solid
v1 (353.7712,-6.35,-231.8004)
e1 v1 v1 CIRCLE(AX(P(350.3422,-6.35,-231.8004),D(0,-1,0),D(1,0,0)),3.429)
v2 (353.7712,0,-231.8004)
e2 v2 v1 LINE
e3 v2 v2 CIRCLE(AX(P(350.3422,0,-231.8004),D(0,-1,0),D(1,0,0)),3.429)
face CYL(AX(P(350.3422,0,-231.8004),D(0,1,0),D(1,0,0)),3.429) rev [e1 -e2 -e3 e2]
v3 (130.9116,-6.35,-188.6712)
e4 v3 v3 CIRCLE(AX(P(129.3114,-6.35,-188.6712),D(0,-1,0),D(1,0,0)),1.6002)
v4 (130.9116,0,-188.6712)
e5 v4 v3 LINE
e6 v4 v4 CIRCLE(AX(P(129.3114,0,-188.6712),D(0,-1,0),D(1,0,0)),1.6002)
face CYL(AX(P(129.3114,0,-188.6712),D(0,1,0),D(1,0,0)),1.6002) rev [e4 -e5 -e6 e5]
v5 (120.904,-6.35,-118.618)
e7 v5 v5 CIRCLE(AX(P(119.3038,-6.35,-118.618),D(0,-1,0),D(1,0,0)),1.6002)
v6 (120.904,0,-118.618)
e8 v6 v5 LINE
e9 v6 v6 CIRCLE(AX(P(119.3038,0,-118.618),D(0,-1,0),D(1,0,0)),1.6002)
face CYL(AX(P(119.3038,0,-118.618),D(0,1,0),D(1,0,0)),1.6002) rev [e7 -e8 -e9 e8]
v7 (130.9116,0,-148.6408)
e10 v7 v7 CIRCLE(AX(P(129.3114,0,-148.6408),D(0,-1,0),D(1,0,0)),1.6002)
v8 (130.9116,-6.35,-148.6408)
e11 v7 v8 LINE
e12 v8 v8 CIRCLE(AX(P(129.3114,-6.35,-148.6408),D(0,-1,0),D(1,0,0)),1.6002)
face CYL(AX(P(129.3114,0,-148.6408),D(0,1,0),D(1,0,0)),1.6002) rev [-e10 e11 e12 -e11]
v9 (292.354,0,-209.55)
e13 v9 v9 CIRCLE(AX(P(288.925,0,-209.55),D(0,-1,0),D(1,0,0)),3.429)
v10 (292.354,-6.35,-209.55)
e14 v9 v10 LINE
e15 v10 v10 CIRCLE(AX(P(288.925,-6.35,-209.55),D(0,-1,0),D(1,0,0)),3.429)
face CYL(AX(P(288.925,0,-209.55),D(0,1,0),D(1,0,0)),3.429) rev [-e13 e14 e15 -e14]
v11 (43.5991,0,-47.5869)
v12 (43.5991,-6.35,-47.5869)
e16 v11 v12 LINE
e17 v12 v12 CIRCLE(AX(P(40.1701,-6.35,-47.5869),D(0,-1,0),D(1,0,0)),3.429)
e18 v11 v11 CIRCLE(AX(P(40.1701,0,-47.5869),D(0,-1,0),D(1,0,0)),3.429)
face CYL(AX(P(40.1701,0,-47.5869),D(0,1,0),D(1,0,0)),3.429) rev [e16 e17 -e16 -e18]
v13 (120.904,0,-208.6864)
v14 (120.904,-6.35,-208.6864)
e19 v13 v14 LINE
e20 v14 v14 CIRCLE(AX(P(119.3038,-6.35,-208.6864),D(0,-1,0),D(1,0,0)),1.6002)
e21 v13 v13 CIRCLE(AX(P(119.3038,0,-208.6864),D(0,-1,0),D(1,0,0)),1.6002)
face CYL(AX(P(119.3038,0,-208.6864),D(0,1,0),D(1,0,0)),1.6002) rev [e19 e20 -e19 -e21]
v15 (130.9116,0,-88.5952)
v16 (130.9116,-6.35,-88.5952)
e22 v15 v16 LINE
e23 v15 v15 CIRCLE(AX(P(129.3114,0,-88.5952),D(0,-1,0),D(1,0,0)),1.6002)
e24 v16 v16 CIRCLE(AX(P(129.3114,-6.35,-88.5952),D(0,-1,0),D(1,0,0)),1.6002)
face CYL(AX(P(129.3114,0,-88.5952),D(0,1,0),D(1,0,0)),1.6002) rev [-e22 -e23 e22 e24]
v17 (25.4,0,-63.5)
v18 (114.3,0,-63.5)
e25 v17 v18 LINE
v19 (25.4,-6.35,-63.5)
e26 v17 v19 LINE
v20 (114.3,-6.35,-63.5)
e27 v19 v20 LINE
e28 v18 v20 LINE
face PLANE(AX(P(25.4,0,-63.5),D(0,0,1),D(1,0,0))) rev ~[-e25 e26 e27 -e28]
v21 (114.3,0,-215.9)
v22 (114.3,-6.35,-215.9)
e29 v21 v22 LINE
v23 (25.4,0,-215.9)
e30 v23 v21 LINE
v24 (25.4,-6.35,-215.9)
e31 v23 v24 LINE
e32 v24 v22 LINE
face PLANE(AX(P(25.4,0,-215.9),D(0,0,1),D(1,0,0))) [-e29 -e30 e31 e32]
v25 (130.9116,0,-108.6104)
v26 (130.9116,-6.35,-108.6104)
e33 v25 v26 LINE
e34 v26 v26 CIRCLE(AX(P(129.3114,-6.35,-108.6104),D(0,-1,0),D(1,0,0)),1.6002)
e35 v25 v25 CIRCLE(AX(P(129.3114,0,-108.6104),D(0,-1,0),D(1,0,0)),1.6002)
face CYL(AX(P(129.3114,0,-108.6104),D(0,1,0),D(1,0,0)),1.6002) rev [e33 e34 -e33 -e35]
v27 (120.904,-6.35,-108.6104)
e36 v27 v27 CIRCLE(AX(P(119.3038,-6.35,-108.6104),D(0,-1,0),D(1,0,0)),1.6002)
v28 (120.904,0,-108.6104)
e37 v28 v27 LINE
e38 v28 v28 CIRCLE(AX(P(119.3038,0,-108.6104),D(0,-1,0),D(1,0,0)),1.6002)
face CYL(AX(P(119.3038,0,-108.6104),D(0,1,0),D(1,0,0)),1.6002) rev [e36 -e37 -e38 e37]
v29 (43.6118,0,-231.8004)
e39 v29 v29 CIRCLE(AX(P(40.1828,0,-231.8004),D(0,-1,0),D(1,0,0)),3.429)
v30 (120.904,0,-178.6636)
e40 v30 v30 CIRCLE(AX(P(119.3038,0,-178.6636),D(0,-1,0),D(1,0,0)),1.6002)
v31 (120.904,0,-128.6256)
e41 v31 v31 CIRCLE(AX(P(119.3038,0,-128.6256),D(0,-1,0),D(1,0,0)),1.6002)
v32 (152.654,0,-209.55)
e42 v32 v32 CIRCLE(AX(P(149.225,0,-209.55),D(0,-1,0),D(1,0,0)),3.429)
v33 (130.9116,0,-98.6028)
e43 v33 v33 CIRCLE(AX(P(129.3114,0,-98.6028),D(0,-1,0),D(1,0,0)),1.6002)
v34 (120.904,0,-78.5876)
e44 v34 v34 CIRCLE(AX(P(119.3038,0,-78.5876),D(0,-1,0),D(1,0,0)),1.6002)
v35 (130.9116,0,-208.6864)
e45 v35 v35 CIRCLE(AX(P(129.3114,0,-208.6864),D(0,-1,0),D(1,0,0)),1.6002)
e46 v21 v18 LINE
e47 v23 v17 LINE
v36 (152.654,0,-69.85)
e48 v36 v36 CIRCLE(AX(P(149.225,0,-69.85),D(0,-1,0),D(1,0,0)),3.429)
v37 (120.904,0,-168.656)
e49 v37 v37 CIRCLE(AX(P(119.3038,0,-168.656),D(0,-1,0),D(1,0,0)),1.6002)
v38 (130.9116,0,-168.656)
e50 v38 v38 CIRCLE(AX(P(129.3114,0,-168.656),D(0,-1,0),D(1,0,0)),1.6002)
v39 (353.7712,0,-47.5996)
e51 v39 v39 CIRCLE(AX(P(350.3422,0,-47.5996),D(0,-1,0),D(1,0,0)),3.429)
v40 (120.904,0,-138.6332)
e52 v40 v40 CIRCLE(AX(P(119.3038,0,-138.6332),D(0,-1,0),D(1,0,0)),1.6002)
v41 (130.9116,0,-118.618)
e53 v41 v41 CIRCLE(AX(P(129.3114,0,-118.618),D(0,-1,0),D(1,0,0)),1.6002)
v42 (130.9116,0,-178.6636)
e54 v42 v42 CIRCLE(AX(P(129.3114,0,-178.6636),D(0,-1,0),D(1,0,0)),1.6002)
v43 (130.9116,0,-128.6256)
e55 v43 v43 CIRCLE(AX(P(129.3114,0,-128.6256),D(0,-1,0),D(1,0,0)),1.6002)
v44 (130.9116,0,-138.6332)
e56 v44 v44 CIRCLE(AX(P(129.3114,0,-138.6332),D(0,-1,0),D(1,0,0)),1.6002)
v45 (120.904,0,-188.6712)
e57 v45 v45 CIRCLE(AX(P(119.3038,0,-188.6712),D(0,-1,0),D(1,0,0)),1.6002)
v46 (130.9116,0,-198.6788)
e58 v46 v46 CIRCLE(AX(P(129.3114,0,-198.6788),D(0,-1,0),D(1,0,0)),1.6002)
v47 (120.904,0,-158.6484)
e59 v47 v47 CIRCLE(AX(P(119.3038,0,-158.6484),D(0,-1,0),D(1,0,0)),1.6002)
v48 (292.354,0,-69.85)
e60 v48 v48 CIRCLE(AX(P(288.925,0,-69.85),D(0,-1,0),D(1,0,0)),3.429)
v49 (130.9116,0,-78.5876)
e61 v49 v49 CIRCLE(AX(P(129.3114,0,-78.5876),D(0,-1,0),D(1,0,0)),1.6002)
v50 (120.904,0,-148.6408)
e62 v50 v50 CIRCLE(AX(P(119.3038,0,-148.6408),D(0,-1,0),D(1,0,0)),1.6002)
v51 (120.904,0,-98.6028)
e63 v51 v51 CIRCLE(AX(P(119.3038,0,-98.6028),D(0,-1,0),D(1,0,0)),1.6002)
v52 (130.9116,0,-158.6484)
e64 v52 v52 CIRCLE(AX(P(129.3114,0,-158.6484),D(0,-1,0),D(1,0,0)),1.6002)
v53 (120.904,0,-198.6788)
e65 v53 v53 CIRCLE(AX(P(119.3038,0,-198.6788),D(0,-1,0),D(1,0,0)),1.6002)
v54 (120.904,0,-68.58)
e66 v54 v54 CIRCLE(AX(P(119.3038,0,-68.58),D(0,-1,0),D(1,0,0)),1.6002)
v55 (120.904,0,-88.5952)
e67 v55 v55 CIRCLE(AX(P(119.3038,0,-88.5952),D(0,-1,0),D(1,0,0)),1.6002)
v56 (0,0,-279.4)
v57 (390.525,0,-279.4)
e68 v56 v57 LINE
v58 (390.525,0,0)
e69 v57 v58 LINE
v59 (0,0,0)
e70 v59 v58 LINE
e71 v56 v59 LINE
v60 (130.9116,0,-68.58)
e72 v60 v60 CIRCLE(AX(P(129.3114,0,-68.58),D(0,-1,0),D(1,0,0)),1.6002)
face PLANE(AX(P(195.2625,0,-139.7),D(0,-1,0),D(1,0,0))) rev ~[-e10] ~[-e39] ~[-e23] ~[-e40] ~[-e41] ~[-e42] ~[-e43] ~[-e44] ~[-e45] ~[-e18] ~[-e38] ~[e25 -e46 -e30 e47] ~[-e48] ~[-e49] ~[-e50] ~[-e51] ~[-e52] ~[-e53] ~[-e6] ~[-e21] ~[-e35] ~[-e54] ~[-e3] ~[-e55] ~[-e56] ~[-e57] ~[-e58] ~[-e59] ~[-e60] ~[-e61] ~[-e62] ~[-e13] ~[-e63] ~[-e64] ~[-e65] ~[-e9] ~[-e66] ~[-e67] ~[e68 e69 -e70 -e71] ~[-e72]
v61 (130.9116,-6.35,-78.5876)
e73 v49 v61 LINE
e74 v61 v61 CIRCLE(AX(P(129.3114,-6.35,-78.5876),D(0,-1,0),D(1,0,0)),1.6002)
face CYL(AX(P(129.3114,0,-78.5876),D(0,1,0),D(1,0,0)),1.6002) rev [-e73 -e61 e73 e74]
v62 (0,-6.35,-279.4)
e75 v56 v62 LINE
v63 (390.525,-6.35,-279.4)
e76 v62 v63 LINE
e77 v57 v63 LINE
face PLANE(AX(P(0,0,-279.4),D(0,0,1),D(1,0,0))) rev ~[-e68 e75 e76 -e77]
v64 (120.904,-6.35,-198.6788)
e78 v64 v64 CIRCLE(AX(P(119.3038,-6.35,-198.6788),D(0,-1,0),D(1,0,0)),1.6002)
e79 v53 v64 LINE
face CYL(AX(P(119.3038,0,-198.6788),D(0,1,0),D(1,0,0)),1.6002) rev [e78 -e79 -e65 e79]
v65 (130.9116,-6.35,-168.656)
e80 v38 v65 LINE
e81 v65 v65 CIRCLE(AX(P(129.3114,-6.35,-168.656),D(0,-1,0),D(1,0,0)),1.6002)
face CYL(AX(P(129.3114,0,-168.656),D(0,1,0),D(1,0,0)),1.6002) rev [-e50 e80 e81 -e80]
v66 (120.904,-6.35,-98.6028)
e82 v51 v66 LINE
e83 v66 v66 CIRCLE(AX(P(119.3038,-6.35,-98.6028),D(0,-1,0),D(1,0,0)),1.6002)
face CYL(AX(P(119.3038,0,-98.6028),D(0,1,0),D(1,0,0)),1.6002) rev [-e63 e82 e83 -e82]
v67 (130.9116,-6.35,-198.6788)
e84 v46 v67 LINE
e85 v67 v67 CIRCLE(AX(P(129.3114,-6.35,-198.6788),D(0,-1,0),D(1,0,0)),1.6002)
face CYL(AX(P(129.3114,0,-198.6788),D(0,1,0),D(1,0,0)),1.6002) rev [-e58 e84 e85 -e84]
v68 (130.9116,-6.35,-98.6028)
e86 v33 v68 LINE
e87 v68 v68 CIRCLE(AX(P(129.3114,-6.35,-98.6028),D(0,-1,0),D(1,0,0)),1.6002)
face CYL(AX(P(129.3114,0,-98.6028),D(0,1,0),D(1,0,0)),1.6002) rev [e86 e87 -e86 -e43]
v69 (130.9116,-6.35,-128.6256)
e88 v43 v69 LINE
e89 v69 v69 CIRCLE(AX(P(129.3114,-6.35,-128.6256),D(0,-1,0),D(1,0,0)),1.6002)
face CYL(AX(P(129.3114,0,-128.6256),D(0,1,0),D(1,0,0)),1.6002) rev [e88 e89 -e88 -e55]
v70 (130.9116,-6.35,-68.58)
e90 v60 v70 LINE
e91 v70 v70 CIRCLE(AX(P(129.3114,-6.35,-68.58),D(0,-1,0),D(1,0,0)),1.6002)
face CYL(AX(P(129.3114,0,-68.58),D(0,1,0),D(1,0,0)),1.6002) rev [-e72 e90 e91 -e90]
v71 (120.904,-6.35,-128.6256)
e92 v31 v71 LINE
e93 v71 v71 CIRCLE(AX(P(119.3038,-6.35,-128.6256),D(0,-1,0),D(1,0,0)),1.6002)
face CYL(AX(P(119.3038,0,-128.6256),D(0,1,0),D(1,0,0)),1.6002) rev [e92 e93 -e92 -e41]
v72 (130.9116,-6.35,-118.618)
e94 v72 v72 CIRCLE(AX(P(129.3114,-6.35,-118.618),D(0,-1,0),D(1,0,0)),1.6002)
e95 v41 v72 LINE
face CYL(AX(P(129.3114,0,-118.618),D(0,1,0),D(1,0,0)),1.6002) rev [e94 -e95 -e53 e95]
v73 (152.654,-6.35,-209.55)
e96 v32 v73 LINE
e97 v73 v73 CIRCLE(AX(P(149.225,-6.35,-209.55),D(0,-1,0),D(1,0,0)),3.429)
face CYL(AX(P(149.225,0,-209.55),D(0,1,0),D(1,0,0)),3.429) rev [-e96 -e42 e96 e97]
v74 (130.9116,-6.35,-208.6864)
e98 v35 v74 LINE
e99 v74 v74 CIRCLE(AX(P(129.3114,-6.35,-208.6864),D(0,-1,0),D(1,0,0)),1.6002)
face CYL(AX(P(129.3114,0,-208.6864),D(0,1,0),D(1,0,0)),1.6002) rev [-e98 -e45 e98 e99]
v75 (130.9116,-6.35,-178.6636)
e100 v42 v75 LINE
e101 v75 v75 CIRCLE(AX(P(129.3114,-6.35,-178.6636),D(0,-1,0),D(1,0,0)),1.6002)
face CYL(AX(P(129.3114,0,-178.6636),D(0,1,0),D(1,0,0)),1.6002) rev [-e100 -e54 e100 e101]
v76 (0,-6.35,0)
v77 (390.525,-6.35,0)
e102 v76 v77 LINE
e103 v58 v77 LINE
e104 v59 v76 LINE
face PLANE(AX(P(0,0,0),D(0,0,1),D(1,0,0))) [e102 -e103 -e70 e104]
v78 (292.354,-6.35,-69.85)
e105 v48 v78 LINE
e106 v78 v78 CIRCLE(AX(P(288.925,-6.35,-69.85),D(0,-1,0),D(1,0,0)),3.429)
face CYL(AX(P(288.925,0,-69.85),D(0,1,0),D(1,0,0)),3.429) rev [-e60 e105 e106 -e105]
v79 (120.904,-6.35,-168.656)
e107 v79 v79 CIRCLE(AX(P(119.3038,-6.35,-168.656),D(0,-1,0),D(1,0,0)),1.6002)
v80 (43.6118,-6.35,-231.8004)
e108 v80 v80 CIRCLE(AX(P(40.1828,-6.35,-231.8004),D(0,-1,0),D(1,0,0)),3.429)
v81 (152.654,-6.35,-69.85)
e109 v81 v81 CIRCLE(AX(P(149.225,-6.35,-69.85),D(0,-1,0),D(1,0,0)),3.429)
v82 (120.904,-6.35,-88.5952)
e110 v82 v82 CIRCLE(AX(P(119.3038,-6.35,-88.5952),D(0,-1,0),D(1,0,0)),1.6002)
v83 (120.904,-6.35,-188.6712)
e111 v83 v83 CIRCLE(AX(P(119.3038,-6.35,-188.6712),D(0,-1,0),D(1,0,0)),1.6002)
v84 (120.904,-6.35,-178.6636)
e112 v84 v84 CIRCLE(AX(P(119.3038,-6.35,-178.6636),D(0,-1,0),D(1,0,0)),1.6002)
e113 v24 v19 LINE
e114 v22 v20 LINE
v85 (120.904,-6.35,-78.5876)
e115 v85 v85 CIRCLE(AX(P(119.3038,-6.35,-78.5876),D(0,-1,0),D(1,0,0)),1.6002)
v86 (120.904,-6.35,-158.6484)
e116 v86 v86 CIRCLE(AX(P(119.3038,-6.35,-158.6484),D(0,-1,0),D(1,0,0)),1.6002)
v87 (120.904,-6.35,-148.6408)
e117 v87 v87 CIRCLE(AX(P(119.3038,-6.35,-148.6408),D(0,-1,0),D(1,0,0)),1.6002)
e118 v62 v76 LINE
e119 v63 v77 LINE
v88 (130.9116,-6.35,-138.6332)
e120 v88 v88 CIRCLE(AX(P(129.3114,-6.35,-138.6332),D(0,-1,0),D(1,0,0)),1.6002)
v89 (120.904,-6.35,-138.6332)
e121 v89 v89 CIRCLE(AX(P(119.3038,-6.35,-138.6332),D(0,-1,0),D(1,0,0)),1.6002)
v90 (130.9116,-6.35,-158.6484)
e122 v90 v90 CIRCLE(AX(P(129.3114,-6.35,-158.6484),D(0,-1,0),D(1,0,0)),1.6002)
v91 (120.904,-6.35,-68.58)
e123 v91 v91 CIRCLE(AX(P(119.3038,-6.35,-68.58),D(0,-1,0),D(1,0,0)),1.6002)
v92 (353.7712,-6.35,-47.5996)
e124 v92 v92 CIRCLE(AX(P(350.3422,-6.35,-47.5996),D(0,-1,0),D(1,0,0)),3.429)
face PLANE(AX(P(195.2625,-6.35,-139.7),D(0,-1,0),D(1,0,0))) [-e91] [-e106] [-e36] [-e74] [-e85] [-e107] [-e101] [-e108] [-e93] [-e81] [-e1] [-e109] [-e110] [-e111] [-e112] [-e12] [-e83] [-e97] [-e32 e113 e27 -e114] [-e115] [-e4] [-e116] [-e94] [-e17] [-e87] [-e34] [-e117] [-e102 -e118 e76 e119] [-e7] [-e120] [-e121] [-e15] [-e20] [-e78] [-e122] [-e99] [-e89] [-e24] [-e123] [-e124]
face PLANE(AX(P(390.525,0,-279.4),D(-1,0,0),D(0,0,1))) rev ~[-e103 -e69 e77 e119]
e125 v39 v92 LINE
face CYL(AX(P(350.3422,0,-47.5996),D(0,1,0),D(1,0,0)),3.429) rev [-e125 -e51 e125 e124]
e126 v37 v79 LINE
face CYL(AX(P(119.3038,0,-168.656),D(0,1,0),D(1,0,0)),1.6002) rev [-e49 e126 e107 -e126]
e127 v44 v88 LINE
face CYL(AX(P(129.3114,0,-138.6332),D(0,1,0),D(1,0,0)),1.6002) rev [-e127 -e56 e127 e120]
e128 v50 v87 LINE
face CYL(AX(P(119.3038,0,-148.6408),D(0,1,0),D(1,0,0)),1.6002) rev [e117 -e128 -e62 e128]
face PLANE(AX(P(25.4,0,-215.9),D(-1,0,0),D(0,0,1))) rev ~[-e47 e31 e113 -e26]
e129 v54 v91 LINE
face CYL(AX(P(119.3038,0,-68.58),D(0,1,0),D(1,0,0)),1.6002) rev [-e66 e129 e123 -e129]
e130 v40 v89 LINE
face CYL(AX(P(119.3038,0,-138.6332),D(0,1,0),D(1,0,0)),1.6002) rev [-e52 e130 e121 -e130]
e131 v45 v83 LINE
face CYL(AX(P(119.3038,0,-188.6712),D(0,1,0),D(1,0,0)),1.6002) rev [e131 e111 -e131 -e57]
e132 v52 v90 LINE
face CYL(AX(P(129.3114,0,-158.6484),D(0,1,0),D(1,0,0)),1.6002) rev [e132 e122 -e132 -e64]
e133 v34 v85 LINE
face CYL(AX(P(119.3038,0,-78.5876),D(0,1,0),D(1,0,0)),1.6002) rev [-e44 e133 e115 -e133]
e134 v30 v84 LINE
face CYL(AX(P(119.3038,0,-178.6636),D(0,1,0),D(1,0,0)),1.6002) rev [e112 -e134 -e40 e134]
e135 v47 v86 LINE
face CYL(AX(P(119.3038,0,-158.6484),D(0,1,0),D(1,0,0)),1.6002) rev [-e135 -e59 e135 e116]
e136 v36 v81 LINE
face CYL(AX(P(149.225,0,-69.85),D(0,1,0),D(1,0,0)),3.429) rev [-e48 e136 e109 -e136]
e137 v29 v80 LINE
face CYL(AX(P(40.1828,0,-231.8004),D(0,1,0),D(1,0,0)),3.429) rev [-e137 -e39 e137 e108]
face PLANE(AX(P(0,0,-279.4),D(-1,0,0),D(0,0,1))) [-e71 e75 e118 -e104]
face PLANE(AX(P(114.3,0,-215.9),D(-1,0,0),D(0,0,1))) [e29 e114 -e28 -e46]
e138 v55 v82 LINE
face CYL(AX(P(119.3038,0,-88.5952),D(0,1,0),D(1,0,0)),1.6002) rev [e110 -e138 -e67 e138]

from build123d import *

# Parameters (mm, degrees)
F0_W     = 390.525
F0_H     = 279.4
F0_R     = 3.429
F0_R_2   = 1.6002
F0_W_2   = 88.9
F0_H_2   = 152.4
F1_DEPTH = 6.35


# Not quite as in the source:
# - a feature names something its author has since deleted; it is built from what else it names


with BuildPart() as f1:
    # F0 (on Front) → F1 (new body)
    with BuildSketch(Plane.XZ):
        with Locations((195.2625, -139.7)):
            Rectangle(F0_W, F0_H)
        with Locations((40.1828, -231.8004)):
            Circle(F0_R, mode=Mode.SUBTRACT)
        with Locations((149.225, -209.55)):
            Circle(F0_R, mode=Mode.SUBTRACT)
        with Locations((119.3038, -208.6864)):
            Circle(F0_R_2, mode=Mode.SUBTRACT)
        with Locations((119.3038, -198.6788)):
            Circle(F0_R_2, mode=Mode.SUBTRACT)
        with Locations((129.3114, -208.6864)):
            Circle(F0_R_2, mode=Mode.SUBTRACT)
        with Locations((129.3114, -198.6788)):
            Circle(F0_R_2, mode=Mode.SUBTRACT)
        with Locations((119.3038, -188.6712)):
            Circle(F0_R_2, mode=Mode.SUBTRACT)
        with Locations((119.3038, -178.6636)):
            Circle(F0_R_2, mode=Mode.SUBTRACT)
        with Locations((129.3114, -188.6712)):
            Circle(F0_R_2, mode=Mode.SUBTRACT)
        with Locations((129.3114, -178.6636)):
            Circle(F0_R_2, mode=Mode.SUBTRACT)
        with Locations((119.3038, -168.656)):
            Circle(F0_R_2, mode=Mode.SUBTRACT)
        with Locations((119.3038, -158.6484)):
            Circle(F0_R_2, mode=Mode.SUBTRACT)
        with Locations((129.3114, -168.656)):
            Circle(F0_R_2, mode=Mode.SUBTRACT)
        with Locations((129.3114, -158.6484)):
            Circle(F0_R_2, mode=Mode.SUBTRACT)
        with Locations((119.3038, -148.6408)):
            Circle(F0_R_2, mode=Mode.SUBTRACT)
        with Locations((129.3114, -148.6408)):
            Circle(F0_R_2, mode=Mode.SUBTRACT)
        with Locations((288.925, -209.55)):
            Circle(F0_R, mode=Mode.SUBTRACT)
        with Locations((350.3422, -231.8004)):
            Circle(F0_R, mode=Mode.SUBTRACT)
        with Locations((69.85, -139.7)):
            Rectangle(F0_W_2, F0_H_2, mode=Mode.SUBTRACT)
        with Locations((119.3038, -138.6332)):
            Circle(F0_R_2, mode=Mode.SUBTRACT)
        with Locations((119.3038, -128.6256)):
            Circle(F0_R_2, mode=Mode.SUBTRACT)
        with Locations((129.3114, -138.6332)):
            Circle(F0_R_2, mode=Mode.SUBTRACT)
        with Locations((129.3114, -128.6256)):
            Circle(F0_R_2, mode=Mode.SUBTRACT)
        with Locations((119.3038, -118.618)):
            Circle(F0_R_2, mode=Mode.SUBTRACT)
        with Locations((119.3038, -108.6104)):
            Circle(F0_R_2, mode=Mode.SUBTRACT)
        with Locations((129.3114, -118.618)):
            Circle(F0_R_2, mode=Mode.SUBTRACT)
        with Locations((129.3114, -108.6104)):
            Circle(F0_R_2, mode=Mode.SUBTRACT)
        with Locations((119.3038, -98.6028)):
            Circle(F0_R_2, mode=Mode.SUBTRACT)
        with Locations((119.3038, -88.5952)):
            Circle(F0_R_2, mode=Mode.SUBTRACT)
        with Locations((129.3114, -98.6028)):
            Circle(F0_R_2, mode=Mode.SUBTRACT)
        with Locations((129.3114, -88.5952)):
            Circle(F0_R_2, mode=Mode.SUBTRACT)
        with Locations((119.3038, -78.5876)):
            Circle(F0_R_2, mode=Mode.SUBTRACT)
        with Locations((129.3114, -78.5876)):
            Circle(F0_R_2, mode=Mode.SUBTRACT)
        with Locations((40.1701, -47.5869)):
            Circle(F0_R, mode=Mode.SUBTRACT)
        with Locations((119.3038, -68.58)):
            Circle(F0_R_2, mode=Mode.SUBTRACT)
        with Locations((129.3114, -68.58)):
            Circle(F0_R_2, mode=Mode.SUBTRACT)
        with Locations((149.225, -69.85)):
            Circle(F0_R, mode=Mode.SUBTRACT)
        with Locations((288.925, -69.85)):
            Circle(F0_R, mode=Mode.SUBTRACT)
        with Locations((350.3422, -47.5996)):
            Circle(F0_R, mode=Mode.SUBTRACT)
    extrude(amount=F1_DEPTH)


solid = f1.part
